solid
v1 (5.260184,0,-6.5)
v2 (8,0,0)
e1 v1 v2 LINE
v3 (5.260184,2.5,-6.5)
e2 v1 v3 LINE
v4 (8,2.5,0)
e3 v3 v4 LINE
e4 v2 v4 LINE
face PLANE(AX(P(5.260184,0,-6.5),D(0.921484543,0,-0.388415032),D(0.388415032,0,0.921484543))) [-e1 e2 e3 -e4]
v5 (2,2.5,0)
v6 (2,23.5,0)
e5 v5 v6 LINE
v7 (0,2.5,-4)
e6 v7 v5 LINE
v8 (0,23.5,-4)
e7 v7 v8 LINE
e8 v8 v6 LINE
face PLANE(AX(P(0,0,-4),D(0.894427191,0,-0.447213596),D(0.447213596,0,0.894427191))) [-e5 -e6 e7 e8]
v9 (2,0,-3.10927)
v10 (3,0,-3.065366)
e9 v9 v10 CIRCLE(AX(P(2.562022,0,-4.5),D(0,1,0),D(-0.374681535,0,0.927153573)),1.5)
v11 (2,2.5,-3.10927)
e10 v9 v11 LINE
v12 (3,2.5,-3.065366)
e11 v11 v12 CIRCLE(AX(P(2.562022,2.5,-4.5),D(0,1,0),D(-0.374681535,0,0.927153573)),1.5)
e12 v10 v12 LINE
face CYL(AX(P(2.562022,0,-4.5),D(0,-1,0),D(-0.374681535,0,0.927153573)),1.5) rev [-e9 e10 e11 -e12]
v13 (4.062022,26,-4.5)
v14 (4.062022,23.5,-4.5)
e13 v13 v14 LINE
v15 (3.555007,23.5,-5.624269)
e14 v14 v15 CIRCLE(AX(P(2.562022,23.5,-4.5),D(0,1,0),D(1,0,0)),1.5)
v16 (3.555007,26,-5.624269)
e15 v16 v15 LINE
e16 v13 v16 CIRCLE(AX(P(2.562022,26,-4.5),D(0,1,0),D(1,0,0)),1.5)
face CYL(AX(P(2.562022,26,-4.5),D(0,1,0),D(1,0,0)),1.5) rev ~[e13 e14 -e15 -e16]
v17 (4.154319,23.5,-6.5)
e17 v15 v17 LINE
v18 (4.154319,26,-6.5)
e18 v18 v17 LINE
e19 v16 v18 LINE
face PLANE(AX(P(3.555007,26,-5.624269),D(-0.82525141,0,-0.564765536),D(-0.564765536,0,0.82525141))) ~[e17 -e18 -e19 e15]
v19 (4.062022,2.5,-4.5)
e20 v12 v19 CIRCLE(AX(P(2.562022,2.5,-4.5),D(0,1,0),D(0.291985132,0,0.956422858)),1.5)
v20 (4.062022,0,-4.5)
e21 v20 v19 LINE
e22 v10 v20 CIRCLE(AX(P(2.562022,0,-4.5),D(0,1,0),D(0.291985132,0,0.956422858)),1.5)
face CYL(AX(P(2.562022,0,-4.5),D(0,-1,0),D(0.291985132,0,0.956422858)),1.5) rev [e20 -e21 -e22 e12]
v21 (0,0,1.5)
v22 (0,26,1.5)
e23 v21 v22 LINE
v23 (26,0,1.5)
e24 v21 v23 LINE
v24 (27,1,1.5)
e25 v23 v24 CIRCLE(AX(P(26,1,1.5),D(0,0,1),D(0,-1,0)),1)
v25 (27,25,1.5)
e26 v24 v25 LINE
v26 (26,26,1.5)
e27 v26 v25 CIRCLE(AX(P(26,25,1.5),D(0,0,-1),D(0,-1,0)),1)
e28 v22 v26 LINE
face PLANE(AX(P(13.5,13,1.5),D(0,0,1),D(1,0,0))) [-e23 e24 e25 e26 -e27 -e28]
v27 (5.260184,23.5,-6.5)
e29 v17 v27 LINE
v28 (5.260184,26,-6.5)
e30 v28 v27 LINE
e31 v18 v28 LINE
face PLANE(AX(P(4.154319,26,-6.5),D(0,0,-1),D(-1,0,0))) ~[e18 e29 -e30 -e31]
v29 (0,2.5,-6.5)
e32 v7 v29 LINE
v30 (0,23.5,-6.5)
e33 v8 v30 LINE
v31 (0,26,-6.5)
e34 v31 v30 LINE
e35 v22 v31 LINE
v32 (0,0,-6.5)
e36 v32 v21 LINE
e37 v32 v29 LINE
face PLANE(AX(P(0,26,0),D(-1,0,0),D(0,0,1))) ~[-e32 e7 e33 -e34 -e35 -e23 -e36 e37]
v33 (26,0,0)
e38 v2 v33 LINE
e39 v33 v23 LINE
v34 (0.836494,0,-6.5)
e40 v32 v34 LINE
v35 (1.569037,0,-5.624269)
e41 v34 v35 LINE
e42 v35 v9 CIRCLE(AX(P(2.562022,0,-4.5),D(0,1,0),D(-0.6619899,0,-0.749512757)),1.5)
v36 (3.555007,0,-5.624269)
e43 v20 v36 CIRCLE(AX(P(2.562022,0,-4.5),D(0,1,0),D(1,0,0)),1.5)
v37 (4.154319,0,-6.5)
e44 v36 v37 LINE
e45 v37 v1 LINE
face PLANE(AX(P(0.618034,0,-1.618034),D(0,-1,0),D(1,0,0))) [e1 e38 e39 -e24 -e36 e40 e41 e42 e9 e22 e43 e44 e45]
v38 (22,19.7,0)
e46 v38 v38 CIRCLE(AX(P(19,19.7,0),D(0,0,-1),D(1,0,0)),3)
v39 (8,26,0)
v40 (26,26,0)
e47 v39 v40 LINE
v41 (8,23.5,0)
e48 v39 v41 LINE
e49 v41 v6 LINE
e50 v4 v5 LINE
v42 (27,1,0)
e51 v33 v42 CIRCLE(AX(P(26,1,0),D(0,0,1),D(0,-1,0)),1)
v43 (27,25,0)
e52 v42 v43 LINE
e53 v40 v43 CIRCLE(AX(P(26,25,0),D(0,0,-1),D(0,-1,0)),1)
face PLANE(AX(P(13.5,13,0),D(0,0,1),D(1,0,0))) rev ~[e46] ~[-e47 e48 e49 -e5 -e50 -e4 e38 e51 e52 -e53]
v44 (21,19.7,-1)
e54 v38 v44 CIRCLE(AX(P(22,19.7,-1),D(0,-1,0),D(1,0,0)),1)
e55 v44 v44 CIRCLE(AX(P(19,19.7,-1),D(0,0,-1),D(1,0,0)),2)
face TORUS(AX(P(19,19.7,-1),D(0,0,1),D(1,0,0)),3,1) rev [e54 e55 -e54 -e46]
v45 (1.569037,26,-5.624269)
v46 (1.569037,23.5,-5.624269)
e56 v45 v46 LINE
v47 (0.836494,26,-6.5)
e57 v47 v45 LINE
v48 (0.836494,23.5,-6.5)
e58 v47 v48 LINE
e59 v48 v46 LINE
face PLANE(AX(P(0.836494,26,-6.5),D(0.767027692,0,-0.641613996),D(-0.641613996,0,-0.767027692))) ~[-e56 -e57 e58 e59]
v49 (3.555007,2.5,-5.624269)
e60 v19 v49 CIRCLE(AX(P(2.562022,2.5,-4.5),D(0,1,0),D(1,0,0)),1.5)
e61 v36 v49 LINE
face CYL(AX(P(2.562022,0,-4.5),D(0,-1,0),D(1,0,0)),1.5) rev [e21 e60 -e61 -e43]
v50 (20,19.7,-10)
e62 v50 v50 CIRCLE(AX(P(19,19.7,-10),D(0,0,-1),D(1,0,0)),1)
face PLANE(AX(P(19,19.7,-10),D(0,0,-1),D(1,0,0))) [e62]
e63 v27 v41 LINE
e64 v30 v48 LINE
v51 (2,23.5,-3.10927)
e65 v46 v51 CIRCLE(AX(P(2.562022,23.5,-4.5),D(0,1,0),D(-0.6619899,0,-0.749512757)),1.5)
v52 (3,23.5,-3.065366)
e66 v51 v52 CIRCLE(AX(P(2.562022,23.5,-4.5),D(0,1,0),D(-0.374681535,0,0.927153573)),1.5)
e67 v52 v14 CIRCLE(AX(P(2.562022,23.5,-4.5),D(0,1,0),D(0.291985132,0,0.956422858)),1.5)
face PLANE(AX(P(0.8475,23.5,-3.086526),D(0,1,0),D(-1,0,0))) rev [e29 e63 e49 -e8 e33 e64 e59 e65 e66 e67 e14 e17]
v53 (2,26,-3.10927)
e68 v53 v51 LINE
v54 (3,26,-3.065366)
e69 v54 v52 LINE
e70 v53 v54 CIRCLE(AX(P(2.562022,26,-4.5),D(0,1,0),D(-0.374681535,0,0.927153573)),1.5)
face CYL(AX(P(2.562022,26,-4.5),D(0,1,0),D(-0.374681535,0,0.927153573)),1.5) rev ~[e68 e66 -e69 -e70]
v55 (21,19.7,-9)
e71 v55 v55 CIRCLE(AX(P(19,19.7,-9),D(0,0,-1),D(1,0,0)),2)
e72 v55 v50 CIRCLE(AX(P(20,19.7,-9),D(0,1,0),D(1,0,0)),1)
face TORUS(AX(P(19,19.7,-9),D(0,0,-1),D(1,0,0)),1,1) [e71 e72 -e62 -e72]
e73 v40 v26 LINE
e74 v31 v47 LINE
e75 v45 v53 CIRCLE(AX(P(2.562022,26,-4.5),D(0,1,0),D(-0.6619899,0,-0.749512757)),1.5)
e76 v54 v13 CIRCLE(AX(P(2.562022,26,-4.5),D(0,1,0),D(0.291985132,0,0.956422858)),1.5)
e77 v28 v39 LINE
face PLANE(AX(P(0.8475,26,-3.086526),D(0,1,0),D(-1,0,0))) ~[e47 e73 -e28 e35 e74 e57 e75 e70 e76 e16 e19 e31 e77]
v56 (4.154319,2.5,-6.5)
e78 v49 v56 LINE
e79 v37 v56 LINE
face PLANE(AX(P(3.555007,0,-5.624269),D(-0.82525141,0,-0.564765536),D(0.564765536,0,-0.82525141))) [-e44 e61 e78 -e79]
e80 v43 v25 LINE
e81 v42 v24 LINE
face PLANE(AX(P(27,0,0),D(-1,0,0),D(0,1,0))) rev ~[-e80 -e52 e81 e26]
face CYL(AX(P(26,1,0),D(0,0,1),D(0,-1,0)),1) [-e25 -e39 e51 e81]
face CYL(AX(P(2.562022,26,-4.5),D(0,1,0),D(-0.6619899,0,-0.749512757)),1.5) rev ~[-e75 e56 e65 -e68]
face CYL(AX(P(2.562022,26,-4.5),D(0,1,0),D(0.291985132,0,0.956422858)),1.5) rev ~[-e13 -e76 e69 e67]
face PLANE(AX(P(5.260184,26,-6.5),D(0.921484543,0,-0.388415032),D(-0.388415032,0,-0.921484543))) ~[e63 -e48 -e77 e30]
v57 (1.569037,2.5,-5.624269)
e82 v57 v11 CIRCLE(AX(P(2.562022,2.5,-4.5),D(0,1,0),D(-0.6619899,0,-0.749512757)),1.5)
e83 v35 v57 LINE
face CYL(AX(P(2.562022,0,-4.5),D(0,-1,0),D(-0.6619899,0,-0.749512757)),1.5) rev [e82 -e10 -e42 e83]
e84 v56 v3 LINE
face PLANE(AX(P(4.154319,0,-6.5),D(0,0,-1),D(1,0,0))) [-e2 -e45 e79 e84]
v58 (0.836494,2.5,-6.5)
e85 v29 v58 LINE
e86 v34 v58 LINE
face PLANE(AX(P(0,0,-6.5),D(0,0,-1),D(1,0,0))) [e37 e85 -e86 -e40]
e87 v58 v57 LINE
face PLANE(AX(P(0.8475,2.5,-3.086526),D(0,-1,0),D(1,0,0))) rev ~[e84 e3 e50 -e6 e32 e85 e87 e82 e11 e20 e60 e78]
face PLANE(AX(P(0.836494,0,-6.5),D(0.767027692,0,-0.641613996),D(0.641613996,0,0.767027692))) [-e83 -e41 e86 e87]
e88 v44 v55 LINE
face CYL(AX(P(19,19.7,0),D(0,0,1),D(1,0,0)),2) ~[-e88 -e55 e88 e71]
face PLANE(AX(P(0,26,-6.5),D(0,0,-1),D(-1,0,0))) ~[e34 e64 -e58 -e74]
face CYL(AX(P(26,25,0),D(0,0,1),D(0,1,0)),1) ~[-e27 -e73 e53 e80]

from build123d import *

# Parameters (mm, degrees)
F0_W     = 27
F0_H     = 26
F1_DEPTH = 1.5
F3_DEPTH = 2.5
F5_DEPTH = 26
F7_R     = 2
F8_DEPTH = 10
F9_R     = 1
F10_R    = 1


# Not quite as in the source:
# - a pattern or mirror of a feature is missing from the dataset's text; its kind, count and spacing are read off the source's solid


with BuildPart() as f1:
    # F0 (on Top) → F1 (new body)
    with BuildSketch(Plane.XY):
        with Locations((13.5, 13)):
            Rectangle(F0_W, F0_H)
    extrude(amount=F1_DEPTH)

    # F2 (on Front) → F3 (join)
    with BuildSketch(Plane.XZ):
        with BuildLine():
            Line((2, 0), (0, 0))
            Line((0, 0), (0, -6.5))
            Line((0, -6.5), (0.8364939141, -6.5))
            Line((0.8364939141, -6.5), (1.5690374528, -5.6242691353))
            ThreePointArc((1.5690374528, -5.6242691353), (1.0835712802, -4.2466571982), (2, -3.1092696409))
            Line((2, -3.1092696409), (2, 0))
        make_face()
        with BuildLine():
            Line((8, 0), (3, 0))
            Line((3, 0), (3, -3.0653657134))
            ThreePointArc((3, -3.0653657134), (3.7676272431, -3.6075221422), (4.0620223023, -4.5))
            ThreePointArc((4.0620223023, -4.5), (3.9294061684, -5.1166533571), (3.5550071518, -5.6242691353))
            Line((3.5550071518, -5.6242691353), (4.1543185927, -6.5))
            Line((4.1543185927, -6.5), (5.2601844187, -6.5))
            Line((5.2601844187, -6.5), (8, 0))
        make_face()
        with BuildLine():
            Line((3, 0), (2, 0))
            Line((2, 0), (2, -3.1092696409))
            ThreePointArc((2, -3.1092696409), (2.4962297898, -3.0014435795), (3, -3.0653657134))
            Line((3, -3.0653657134), (3, 0))
        make_face()
    f3 = extrude(amount=-F3_DEPTH)

    # F3_copies: F3 across plane
    add(f3.mirror(Plane.ZX.offset(13)))

    # F4 (on Front) → F5 (join, through all)
    with BuildSketch(Plane.XZ):
        Polygon((2, 0), (0, 0), (0, -4), align=None)
    extrude(amount=-F5_DEPTH)

    # F7 (on face) → F8 (join)
    with BuildSketch(Plane(origin=(0, 0, 0), x_dir=(1, 0, 0), z_dir=(0, 0, -1))):
        with Locations((19, -19.7)):
            Circle(F7_R)
    extrude(amount=F8_DEPTH)

    # F9
    f9_edges = [f1.edges().sort_by_distance(p)[0] for p in [
        (17, 19.7, 0),
        (17, 19.7, -10),
    ]]
    fillet(f9_edges, radius=F9_R)

    # F10
    f10_edges = [f1.edges().sort_by_distance(p)[0] for p in [
        (27, 26, 0.75),
        (27, 0, 0.75),
    ]]
    fillet(f10_edges, radius=F10_R)


solid = f1.part
